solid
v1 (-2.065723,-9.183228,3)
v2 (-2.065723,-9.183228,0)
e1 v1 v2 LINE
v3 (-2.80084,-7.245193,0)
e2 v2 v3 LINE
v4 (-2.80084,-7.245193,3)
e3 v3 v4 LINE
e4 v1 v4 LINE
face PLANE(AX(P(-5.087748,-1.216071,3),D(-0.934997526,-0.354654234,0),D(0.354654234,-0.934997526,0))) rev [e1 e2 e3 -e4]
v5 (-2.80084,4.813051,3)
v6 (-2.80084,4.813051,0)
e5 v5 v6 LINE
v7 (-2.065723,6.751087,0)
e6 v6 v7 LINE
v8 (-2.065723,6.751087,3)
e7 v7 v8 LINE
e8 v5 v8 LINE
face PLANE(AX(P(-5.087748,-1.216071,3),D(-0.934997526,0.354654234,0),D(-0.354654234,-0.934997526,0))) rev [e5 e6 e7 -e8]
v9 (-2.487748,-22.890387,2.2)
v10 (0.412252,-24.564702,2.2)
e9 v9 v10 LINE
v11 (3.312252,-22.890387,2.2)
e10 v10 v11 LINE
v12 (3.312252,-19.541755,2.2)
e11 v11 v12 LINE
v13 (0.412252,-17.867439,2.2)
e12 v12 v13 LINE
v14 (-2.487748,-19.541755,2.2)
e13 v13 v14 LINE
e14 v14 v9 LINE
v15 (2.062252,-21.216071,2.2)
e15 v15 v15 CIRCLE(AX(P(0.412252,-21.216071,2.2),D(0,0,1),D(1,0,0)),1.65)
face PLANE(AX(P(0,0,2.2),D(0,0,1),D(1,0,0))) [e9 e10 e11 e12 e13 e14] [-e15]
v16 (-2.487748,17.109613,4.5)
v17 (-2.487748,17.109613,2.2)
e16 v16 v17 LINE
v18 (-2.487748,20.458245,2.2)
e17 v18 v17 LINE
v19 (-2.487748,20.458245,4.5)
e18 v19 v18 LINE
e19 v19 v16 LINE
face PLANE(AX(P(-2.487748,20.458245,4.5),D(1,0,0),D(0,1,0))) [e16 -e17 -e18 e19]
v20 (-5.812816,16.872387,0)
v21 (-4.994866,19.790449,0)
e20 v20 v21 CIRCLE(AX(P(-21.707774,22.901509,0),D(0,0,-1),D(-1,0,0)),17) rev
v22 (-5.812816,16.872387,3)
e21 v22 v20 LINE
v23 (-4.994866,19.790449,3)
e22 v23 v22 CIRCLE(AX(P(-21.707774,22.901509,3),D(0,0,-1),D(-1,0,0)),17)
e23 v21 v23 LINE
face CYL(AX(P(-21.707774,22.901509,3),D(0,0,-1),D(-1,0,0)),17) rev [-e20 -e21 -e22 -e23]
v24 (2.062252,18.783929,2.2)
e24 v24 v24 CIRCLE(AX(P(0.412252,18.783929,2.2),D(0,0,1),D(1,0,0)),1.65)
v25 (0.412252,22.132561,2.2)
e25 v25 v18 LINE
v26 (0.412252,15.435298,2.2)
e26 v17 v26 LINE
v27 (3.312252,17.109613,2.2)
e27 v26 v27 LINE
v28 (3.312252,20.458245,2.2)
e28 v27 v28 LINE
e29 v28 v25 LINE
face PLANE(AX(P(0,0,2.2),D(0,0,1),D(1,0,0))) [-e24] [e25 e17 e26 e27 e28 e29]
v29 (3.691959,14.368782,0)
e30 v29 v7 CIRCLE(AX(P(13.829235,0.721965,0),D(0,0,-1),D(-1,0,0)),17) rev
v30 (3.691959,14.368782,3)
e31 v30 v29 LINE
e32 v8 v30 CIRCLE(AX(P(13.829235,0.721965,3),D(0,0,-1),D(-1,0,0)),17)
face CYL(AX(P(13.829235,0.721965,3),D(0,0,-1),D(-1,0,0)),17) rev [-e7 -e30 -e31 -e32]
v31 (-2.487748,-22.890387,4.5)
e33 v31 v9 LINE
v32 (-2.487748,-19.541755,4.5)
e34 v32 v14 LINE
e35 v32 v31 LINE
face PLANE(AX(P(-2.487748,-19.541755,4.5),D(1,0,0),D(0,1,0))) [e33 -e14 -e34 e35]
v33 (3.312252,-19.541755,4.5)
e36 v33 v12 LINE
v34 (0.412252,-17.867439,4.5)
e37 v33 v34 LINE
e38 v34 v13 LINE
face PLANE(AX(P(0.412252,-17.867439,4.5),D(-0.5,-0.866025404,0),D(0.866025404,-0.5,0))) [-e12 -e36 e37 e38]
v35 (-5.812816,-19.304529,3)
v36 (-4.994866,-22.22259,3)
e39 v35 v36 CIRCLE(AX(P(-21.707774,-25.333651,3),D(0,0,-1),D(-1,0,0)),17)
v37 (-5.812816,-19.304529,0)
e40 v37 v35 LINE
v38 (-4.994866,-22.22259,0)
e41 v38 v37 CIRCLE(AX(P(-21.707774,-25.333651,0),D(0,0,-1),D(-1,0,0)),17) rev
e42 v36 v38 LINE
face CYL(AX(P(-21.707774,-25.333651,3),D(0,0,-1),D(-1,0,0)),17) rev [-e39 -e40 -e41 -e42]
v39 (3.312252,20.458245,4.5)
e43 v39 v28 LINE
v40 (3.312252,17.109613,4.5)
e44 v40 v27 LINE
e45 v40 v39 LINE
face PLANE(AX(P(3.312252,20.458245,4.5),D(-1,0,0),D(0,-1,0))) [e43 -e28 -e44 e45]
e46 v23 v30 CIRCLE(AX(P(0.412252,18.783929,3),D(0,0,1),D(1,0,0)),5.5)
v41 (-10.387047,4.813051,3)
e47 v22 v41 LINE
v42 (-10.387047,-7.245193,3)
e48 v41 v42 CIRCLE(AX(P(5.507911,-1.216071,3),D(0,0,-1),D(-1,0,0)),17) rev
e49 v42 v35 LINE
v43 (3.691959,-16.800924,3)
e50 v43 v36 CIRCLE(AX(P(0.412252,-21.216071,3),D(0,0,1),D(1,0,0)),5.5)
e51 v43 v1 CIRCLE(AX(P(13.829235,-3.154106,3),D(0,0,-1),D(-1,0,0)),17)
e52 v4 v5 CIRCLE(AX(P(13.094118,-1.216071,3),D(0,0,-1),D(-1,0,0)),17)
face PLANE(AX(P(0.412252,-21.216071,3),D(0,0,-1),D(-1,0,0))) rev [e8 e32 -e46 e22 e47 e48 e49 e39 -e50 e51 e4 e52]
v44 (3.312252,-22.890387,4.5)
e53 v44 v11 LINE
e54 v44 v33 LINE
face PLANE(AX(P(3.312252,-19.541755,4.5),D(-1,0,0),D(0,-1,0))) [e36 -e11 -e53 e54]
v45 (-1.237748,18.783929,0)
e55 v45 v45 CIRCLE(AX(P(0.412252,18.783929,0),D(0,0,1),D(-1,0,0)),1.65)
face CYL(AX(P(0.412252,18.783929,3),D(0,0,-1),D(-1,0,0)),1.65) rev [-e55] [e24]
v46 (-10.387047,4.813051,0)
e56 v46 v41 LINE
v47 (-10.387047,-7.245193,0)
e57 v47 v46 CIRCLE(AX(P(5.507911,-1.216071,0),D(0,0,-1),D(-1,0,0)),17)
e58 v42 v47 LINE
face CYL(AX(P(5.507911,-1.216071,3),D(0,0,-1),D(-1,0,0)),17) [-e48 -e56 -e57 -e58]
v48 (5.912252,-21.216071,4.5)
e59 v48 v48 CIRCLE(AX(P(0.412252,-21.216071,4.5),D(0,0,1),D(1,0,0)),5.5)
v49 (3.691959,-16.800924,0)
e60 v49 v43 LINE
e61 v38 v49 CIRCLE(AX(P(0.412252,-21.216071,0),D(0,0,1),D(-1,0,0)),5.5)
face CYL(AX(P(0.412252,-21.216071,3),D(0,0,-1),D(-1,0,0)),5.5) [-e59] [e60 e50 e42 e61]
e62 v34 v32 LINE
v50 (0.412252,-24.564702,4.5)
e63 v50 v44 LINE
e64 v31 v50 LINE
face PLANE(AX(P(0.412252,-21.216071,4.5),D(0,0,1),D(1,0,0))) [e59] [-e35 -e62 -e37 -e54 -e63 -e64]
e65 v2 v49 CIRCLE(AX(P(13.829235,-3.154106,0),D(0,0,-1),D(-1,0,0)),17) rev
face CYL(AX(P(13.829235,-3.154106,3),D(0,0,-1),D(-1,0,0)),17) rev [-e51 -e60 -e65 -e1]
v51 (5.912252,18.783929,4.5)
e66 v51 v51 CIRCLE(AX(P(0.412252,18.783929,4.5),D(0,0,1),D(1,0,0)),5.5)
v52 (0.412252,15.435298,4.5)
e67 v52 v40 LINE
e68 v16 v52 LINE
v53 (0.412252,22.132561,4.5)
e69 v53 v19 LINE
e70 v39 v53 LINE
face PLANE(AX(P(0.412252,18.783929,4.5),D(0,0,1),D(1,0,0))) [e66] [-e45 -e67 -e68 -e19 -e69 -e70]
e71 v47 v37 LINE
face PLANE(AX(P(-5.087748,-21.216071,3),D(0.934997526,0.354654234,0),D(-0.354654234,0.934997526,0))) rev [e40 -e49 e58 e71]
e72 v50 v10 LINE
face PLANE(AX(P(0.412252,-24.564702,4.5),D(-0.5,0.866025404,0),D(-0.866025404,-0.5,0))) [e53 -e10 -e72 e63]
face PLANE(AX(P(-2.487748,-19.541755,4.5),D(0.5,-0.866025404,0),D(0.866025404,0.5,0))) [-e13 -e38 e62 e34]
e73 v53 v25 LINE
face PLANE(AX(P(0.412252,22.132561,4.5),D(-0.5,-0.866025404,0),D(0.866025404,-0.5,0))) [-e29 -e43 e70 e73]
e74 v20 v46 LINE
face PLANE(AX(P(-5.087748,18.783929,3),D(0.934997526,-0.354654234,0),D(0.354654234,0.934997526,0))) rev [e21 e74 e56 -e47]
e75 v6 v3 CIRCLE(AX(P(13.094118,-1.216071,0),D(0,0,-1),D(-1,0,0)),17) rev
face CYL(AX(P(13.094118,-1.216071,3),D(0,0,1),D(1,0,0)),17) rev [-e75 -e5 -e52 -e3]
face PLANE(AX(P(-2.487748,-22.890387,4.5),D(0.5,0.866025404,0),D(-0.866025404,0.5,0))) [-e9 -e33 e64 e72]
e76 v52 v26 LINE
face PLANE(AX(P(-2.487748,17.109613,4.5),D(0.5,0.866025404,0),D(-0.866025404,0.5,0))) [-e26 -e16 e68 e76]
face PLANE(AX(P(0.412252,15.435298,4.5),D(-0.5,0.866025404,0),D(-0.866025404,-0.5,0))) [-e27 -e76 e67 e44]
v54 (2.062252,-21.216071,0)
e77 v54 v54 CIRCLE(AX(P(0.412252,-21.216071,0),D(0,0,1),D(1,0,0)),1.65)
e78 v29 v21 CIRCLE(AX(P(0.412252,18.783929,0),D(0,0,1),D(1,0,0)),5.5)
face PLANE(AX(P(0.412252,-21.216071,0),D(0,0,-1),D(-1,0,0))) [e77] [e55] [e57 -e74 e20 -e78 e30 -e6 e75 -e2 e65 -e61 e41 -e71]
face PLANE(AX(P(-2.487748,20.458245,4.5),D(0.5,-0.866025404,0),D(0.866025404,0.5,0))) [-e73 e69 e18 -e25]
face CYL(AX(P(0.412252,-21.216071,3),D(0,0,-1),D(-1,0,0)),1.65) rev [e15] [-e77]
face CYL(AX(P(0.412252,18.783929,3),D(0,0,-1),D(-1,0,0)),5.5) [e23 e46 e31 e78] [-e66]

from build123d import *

# Parameters (mm, degrees)
SKETCH_1_R          = 1.65
EXTRUDE_1_DEPTH     = 3
SKETCH_2_R          = 5.5
EXTRUDE_2_DEPTH     = 1.5
CUT_EXTRUDE_1_DEPTH = 0.8
FILLET_1_R          = 17


with BuildPart() as part:
    # 草图1 → 凸台-拉伸1 (new body)
    with BuildSketch(Plane.XY):
        with BuildLine():
            Line((-5.08774827, -1.216070925), (0.41225173, -15.716070925))
            ThreePointArc((0.41225173, -15.716070925), (4.301339026, -25.105158222), (-5.08774827, -21.216070925))
            Line((-5.08774827, -21.216070925), (-12.673955167, -1.216070925))
            Line((-12.673955167, -1.216070925), (-5.08774827, 18.783929075))
            ThreePointArc((-5.08774827, 18.783929075), (4.301339026, 22.673016371), (0.41225173, 13.283929075))
            Line((0.41225173, 13.283929075), (-5.08774827, -1.216070925))
        make_face()
        with Locations((0.41225173, -21.216070925)):
            Circle(SKETCH_1_R, mode=Mode.SUBTRACT)
        with Locations(Location((0.41225173, 18.783929075, 0), (0, 0, 180))):
            Circle(SKETCH_1_R, mode=Mode.SUBTRACT)
    extrude(amount=EXTRUDE_1_DEPTH)

    # 草图2 → 凸台-拉伸2 (add)
    # profile 1 of 2: a face of its own
    with BuildSketch(Plane.XY.offset(3)):
        with Locations(Location((0.41225173, 18.783929075, 0), (0, 0, 180))):
            Circle(SKETCH_2_R)
        Polygon((-2.48774827, 20.458244856), (-2.48774827, 17.109613294), (0.41225173, 15.435297514), (3.31225173, 17.109613294), (3.31225173, 20.458244856), (0.41225173, 22.132560636), align=None, mode=Mode.SUBTRACT)
    # profile 2 of 2: a face of its own
    with BuildSketch(Plane.XY.offset(3)):
        with Locations(Location((0.41225173, -21.216070925, 0), (0, 0, 180))):
            Circle(SKETCH_2_R)
        Polygon((-2.48774827, -19.541755144), (-2.48774827, -22.890386706), (0.41225173, -24.564702486), (3.31225173, -22.890386706), (3.31225173, -19.541755144), (0.41225173, -17.867439364), align=None, mode=Mode.SUBTRACT)
    extrude(amount=EXTRUDE_2_DEPTH)

    # 草图3 → 切除-拉伸1 (cut)
    with BuildSketch(Plane.XY.offset(3)):
        Polygon((0.41225173, 22.132560636), (-2.48774827, 20.458244856), (-2.48774827, 17.109613294), (0.41225173, 15.435297514), (3.31225173, 17.109613294), (3.31225173, 20.458244856), align=None)
        Polygon((0.41225173, -17.867439364), (-2.48774827, -19.541755144), (-2.48774827, -22.890386706), (0.41225173, -24.564702486), (3.31225173, -22.890386706), (3.31225173, -19.541755144), align=None)
    extrude(amount=-CUT_EXTRUDE_1_DEPTH, mode=Mode.SUBTRACT)

    # 圆角1
    # the kernel refuses this fillet: 17 mm, written as the material it adds along each edge
    with BuildSketch(Plane(origin=(-5.08774827, 18.783929075, 0), x_dir=(0.09189054947258435, 0.9957691132574993, 0), z_dir=(0, 0, 1))) as fillet_1_piece_1:
        with BuildLine():
            CenterArc((2.572935385, 16.928074925), FILLET_1_R, 254.500123691, 10.227497936)
            Line((-1.970081643, 0.546347413), (0, 0))
            ThreePointArc((0, 0), (0.505398022, 0.023269877), (1.010796044, 0))
        make_face()
    extrude(amount=3)
    with BuildSketch(Plane(origin=(0.41225173, 13.283929075, 0), x_dir=(-0.3546542341205386, -0.9349975263177835, 0), z_dir=(0, 0, 1))) as fillet_1_piece_2:
        with BuildLine():
            CenterArc((6.987015843, 17), FILLET_1_R, 237.378356152, 32.621643848)
            ThreePointArc((-2.177496959, 2.681770183), (-0.872736529, 1.516278705), (0, 0))
            Line((0, 0), (6.987015843, 0))
        make_face()
    extrude(amount=3)
    with BuildSketch(Plane(origin=(-5.08774827, -1.216070925, 0), x_dir=(0.35465423412053854, 0.9349975263177835, 0), z_dir=(0, 0, 1))) as fillet_1_piece_3:
        with BuildLine():
            CenterArc((FILLET_1_R * 0.379310344828, -FILLET_1_R), FILLET_1_R, 90, 41.544509364)
            Line((-FILLET_1_R * 0.283891318374, -FILLET_1_R * 0.251559251559), (0, 0))
            Line((0, 0), (FILLET_1_R * 0.379310344828, 0))
        make_face()
    extrude(amount=3)
    with BuildSketch(Plane(origin=(0.41225173, -15.716070925, 0), x_dir=(-0.35465423412053854, 0.9349975263177834, 0), z_dir=(0, 0, 1))) as fillet_1_piece_4:
        with BuildLine():
            CenterArc((6.987015843, -17), FILLET_1_R, 90, 32.621643848)
            ThreePointArc((-2.177496959, -2.681770183), (-0.872736529, -1.516278705), (0, 0))
            Line((0, 0), (6.987015843, 0))
        make_face()
    extrude(amount=3)
    with BuildSketch(Plane(origin=(-5.08774827, -21.216070925, 0), x_dir=(0.09189054947258435, -0.9957691132574993, 0), z_dir=(0, 0, 1))) as fillet_1_piece_5:
        with BuildLine():
            CenterArc((2.572935385, -16.928074925), FILLET_1_R, 95.272378373, 10.227497936)
            Line((-1.970081643, -0.546347413), (0, 0))
            ThreePointArc((0, 0), (0.505398022, -0.023269877), (1.010796044, 0))
        make_face()
    extrude(amount=3)
    # the kernel refuses this fillet: 17 mm, written as the material it takes off along each edge
    with BuildSketch(Plane(origin=(-12.673955167, -1.216070925, -16.120689655), x_dir=(0.35465423412053854, 0.9349975263177835, 0), z_dir=(0, 0, 1))) as fillet_1_2_piece_1:
        with BuildLine():
            CenterArc((FILLET_1_R * 0.379310344828, -FILLET_1_R), FILLET_1_R, 90, 41.544509364)
            Line((-FILLET_1_R * 0.283891318374, -FILLET_1_R * 0.251559251559), (0, 0))
            Line((0, 0), (FILLET_1_R * 0.379310344828, 0))
        make_face()
    extrude(amount=35.24137931, mode=Mode.SUBTRACT)


solid = part.part
